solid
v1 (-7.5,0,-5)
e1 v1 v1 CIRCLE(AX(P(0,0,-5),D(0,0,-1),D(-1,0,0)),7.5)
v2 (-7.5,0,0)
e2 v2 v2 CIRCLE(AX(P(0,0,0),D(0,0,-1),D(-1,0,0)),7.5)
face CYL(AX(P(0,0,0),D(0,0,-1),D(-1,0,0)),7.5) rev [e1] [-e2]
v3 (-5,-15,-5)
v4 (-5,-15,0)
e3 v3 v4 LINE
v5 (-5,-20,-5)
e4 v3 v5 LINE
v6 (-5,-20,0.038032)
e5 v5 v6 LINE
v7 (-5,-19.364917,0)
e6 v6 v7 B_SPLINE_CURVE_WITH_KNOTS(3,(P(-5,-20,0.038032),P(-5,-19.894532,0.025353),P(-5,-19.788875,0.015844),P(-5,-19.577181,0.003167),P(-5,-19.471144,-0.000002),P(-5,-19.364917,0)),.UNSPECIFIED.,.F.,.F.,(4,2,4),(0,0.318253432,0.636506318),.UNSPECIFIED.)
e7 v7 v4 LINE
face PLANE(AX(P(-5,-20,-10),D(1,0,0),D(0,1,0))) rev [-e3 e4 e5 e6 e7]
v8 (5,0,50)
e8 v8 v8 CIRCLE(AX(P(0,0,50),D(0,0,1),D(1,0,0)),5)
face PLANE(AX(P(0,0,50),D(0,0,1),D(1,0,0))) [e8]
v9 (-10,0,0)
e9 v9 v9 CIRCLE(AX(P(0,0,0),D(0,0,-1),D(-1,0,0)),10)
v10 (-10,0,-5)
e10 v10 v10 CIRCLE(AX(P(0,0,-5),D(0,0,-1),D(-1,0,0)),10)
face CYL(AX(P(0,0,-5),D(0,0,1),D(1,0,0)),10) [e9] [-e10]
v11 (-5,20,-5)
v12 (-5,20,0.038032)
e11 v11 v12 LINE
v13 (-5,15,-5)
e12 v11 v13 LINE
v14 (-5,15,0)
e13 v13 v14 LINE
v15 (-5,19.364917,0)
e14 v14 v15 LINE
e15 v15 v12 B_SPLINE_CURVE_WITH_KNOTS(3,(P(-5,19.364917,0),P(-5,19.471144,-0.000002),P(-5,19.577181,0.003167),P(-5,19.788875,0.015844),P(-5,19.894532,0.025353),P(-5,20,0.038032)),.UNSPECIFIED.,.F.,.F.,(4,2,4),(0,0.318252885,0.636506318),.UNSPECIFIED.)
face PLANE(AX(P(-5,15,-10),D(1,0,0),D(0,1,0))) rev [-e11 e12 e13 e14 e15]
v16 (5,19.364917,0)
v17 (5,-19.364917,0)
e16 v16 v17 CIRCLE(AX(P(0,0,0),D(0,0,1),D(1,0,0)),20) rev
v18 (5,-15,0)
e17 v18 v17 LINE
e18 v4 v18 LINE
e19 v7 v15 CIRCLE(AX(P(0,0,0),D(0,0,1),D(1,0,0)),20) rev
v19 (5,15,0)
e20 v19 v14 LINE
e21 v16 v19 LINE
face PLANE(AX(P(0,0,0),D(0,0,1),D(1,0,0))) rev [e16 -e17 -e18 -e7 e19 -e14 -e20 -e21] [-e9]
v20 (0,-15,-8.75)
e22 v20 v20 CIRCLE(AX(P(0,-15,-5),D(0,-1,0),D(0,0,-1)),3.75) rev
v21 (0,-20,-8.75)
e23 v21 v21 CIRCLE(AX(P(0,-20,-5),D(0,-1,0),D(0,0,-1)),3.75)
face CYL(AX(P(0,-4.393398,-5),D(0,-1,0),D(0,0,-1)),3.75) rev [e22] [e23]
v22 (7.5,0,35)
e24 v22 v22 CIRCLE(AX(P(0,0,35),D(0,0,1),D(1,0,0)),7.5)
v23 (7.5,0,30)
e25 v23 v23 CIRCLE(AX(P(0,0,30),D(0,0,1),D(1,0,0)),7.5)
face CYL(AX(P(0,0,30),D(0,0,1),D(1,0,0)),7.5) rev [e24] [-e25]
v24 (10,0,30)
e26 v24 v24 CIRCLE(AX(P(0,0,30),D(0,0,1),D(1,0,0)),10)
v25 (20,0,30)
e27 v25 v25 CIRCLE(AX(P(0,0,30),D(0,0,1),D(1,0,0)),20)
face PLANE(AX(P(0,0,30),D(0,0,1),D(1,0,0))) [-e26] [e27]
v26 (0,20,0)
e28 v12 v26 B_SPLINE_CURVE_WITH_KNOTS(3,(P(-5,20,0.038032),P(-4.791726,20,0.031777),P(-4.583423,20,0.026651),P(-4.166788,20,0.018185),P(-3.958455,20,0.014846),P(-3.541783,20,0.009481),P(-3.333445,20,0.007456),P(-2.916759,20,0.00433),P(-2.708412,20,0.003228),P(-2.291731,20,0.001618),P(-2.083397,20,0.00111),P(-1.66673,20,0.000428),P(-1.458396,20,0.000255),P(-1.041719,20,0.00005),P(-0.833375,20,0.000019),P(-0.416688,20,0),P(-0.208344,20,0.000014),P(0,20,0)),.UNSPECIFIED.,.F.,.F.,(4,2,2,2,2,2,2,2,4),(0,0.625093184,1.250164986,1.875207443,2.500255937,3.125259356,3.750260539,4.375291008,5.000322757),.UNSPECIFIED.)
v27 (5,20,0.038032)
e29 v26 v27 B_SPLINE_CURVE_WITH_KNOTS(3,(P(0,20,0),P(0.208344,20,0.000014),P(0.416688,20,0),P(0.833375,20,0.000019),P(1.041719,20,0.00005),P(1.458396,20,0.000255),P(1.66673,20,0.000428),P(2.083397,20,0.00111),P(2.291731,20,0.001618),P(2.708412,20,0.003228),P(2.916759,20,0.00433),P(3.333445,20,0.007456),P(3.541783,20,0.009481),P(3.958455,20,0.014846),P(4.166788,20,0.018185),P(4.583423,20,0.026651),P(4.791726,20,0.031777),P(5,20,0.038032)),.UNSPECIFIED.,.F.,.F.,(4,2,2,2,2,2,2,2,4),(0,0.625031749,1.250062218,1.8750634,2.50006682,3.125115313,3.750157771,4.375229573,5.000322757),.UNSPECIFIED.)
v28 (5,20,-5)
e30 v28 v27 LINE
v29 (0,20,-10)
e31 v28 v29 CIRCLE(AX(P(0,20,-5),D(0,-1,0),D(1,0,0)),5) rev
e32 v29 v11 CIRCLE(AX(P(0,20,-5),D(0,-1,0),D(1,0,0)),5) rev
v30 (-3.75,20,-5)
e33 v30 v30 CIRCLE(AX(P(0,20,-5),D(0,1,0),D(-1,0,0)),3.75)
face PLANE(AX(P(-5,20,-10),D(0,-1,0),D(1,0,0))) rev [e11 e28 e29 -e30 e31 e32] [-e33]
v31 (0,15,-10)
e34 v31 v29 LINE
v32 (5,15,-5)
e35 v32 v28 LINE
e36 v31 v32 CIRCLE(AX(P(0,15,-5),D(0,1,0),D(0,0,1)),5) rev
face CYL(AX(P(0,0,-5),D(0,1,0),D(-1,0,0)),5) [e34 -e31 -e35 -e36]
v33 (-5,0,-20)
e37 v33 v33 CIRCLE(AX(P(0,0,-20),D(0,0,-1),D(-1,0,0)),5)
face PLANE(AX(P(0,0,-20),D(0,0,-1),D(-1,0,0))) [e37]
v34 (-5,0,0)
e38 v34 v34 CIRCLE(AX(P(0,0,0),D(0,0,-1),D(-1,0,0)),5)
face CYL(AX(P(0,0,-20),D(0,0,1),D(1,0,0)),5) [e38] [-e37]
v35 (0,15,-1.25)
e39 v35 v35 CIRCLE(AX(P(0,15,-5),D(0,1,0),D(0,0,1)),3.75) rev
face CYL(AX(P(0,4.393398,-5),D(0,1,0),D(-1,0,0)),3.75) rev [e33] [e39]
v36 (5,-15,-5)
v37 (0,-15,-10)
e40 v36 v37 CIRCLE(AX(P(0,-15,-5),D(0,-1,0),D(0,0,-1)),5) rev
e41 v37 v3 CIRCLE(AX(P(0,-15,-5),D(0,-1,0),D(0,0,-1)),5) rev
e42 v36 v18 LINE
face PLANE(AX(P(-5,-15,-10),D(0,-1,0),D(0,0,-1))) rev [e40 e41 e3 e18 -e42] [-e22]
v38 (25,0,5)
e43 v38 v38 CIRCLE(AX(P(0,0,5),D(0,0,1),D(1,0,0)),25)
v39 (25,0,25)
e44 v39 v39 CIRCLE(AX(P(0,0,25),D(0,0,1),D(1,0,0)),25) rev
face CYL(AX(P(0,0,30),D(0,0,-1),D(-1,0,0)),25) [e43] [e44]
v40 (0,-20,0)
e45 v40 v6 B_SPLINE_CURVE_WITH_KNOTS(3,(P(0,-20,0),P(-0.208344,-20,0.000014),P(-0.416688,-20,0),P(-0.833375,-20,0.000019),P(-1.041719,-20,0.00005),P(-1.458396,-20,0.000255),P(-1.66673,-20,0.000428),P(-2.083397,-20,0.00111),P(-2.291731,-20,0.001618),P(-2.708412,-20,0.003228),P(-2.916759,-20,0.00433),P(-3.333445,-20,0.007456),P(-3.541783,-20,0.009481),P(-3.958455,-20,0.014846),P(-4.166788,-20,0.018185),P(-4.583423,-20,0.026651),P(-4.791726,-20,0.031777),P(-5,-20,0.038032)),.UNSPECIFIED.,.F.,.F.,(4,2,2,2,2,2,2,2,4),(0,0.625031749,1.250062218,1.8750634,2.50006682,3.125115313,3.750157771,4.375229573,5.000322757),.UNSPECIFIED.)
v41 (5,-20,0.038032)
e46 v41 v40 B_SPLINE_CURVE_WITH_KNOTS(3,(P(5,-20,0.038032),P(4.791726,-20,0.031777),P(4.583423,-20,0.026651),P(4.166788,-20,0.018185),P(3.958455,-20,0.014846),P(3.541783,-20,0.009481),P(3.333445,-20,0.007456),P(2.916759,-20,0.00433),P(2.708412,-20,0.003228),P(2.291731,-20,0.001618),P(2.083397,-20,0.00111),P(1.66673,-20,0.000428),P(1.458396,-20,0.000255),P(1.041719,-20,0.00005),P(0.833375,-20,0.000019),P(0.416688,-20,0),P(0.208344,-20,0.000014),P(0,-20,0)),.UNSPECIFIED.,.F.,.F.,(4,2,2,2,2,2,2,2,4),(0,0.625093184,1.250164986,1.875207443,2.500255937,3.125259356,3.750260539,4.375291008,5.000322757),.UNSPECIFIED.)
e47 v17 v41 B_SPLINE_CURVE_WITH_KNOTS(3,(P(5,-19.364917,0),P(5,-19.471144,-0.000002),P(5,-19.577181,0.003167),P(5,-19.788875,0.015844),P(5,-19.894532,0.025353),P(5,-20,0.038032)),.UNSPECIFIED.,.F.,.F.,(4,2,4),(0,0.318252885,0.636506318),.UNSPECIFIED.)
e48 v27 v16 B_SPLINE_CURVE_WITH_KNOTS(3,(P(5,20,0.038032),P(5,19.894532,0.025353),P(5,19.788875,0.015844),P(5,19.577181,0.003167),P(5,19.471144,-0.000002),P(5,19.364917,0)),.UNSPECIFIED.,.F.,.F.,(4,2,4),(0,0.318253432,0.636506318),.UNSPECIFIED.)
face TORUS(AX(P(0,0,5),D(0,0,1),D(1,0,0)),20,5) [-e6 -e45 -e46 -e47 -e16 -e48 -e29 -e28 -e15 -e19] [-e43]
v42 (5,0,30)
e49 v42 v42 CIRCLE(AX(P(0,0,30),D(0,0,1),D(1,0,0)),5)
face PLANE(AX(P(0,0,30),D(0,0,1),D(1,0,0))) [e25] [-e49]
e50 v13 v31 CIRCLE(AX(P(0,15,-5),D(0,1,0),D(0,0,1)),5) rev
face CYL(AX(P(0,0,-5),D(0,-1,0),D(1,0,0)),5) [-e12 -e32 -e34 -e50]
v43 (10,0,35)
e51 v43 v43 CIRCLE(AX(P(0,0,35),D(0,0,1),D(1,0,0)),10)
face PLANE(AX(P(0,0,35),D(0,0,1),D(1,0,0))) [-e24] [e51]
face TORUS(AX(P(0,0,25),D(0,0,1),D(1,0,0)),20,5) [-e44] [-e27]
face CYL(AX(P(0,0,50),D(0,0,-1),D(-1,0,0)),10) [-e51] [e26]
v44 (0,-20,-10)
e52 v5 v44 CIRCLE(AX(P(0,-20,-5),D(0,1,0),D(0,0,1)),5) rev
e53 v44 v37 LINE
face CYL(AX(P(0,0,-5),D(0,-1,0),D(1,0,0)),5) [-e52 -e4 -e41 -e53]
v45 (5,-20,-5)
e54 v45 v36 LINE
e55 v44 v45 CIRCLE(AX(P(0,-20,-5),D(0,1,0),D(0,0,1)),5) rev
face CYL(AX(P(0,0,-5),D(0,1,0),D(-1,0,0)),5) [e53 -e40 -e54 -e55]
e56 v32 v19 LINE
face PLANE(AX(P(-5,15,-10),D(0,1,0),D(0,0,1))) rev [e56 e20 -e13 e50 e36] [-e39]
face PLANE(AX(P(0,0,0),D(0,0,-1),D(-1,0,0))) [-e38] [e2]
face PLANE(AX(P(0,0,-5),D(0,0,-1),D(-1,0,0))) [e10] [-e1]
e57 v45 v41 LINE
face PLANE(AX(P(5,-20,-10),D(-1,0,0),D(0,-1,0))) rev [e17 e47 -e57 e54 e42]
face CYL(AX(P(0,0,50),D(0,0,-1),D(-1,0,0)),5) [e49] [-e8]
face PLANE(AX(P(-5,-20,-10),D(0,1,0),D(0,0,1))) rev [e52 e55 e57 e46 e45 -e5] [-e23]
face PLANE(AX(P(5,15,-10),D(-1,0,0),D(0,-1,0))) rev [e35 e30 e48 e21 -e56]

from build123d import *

# Parameters (mm, degrees)
SKETCH1_R           = 25
BOSS_EXTRUDE1_DEPTH = 30
SKETCH2_R           = 10
BOSS_EXTRUDE2_DEPTH = 20
SKETCH3_R           = 7.5
CUT_EXTRUDE1_DEPTH  = 20
SKETCH4_R           = 5
BOSS_EXTRUDE3_DEPTH = 20
BOSS_EXTRUDE4_START = 5
SKETCH5_R           = 10
BOSS_EXTRUDE4_DEPTH = 5
SKETCH7_W           = 10
SKETCH7_H           = 5
BOSS_EXTRUDE5_DEPTH = 10
SKETCH8_R           = 3.75
CUT_EXTRUDE2_DEPTH  = 5
CUT_EXTRUDE3_START  = -5
SKETCH9_R           = 3.75
CUT_EXTRUDE3_DEPTH  = 5
FILLET1_R           = 5
FILLET2_R           = 5
CUT_EXTRUDE4_START  = -15
SKETCH10_R          = 10
SKETCH10_R_2        = 7.5
CUT_EXTRUDE4_DEPTH  = 15
CUT_EXTRUDE5_START  = -5
SKETCH11_R          = 7.5
CUT_EXTRUDE5_DEPTH  = 5
BOSS_EXTRUDE6_START = 20
SKETCH12_R          = 5
BOSS_EXTRUDE6_DEPTH = 20


# Some blends are built 0.0001 mm under size
with BuildPart() as part:
    # Sketch1 → Boss-Extrude1 (new body)
    with BuildSketch(Plane.XY):
        Circle(SKETCH1_R)
    extrude(amount=BOSS_EXTRUDE1_DEPTH)

    # Sketch2 → Boss-Extrude2 (add)
    with BuildSketch(Plane.XY.offset(30)):
        Circle(SKETCH2_R)
    extrude(amount=BOSS_EXTRUDE2_DEPTH)

    # Sketch3 → Cut-Extrude1 (cut)
    with BuildSketch(Plane.XY.offset(50)):
        Circle(SKETCH3_R)
    extrude(amount=-CUT_EXTRUDE1_DEPTH, mode=Mode.SUBTRACT)

    # Sketch4 → Boss-Extrude3 (add)
    with BuildSketch(Plane.XY.offset(30)):
        Circle(SKETCH4_R)
    extrude(amount=BOSS_EXTRUDE3_DEPTH)

    # Sketch5 → Boss-Extrude4 (add)
    with BuildSketch(Plane(origin=(0, 0, 0), x_dir=(-1, 0, 0), z_dir=(0, 0, -1)).offset(BOSS_EXTRUDE4_START)):
        with Locations(Location((0, 0, 0), (0, 0, 180))):
            Circle(SKETCH5_R)
    extrude(amount=-BOSS_EXTRUDE4_DEPTH)

    # Sketch7 → Boss-Extrude5 (add)
    with BuildSketch(Plane(origin=(0, 0, 0), x_dir=(-1, 0, 0), z_dir=(0, 0, -1))):
        with Locations((0, 17.5)):
            Rectangle(SKETCH7_W, SKETCH7_H)
        with Locations((0, -17.5)):
            Rectangle(SKETCH7_W, SKETCH7_H)
    extrude(amount=BOSS_EXTRUDE5_DEPTH)

    # Sketch8 → Cut-Extrude2 (cut)
    with BuildSketch(Plane(origin=(0, 20, 0), x_dir=(1, 0, 0), z_dir=(0, 1, 0))):
        with Locations(Location((0, 5, 0), (0, 0, 180))):
            Circle(SKETCH8_R)
    extrude(amount=-CUT_EXTRUDE2_DEPTH, mode=Mode.SUBTRACT)

    # Sketch9 → Cut-Extrude3 (cut)
    with BuildSketch(Plane(origin=(0, -20, 0), x_dir=(-1, 0, 0), z_dir=(0, -1, 0)).offset(CUT_EXTRUDE3_START)):
        with Locations((0, 5)):
            Circle(SKETCH9_R)
    extrude(amount=CUT_EXTRUDE3_DEPTH, mode=Mode.SUBTRACT)

    # Fillet1
    # the kernel refuses this fillet: 5 mm, written as the material it takes off along each edge
    with BuildSketch(Plane(origin=(0, 0, 30), x_dir=(1, 0, 0), z_dir=(0, -1, 0))) as fillet1_piece_1:
        with BuildLine():
            CenterArc((25 - FILLET1_R, -FILLET1_R), FILLET1_R, 0, 90)
            Line((25 - FILLET1_R, 0), (25, 0))
            Line((25, 0), (25, -FILLET1_R))
        make_face()
    revolve(axis=Axis((0, 0, 30), (0, 0, 1)), mode=Mode.SUBTRACT)
    with BuildSketch(Plane(origin=(0, 0, 0), x_dir=(1, 0, 0), z_dir=(0, -1, 0))) as fillet1_piece_2_section:
        with BuildLine():
            CenterArc((25 - FILLET1_R, FILLET1_R), FILLET1_R, 270, 90)
            Line((25 - FILLET1_R, 0), (25, 0))
            Line((25, 0), (25, FILLET1_R))
        make_face()
    fillet1_piece_2 = revolve(axis=Axis((0, 0, 0), (0, 0, 1)), mode=Mode.PRIVATE)
    fillet1_piece_2 = split(fillet1_piece_2, bisect_by=Plane(origin=(5, 14.511659558, 1.419610571), z_dir=(1, 0, 0)), keep=Keep.TOP, mode=Mode.PRIVATE)
    add(fillet1_piece_2, mode=Mode.SUBTRACT)
    with BuildSketch(Plane(origin=(0, 0, 0), x_dir=(1, 0, 0), z_dir=(0, -1, 0))) as fillet1_piece_3_section:
        with BuildLine():
            CenterArc((25 - FILLET1_R, FILLET1_R), FILLET1_R, 270, 90)
            Line((25 - FILLET1_R, 0), (25, 0))
            Line((25, 0), (25, FILLET1_R))
        make_face()
    fillet1_piece_3 = revolve(axis=Axis((0, 0, 0), (0, 0, 1)), mode=Mode.PRIVATE)
    fillet1_piece_3 = split(fillet1_piece_3, bisect_by=Plane(origin=(4.6e-08, 20, 1.116734198), z_dir=(0, 1, 0)), keep=Keep.TOP, mode=Mode.PRIVATE)
    add(fillet1_piece_3, mode=Mode.SUBTRACT)
    with BuildSketch(Plane(origin=(0, 0, 0), x_dir=(1, 0, 0), z_dir=(0, -1, 0))) as fillet1_piece_4_section:
        with BuildLine():
            CenterArc((25 - FILLET1_R, FILLET1_R), FILLET1_R, 270, 90)
            Line((25 - FILLET1_R, 0), (25, 0))
            Line((25, 0), (25, FILLET1_R))
        make_face()
    fillet1_piece_4 = revolve(axis=Axis((0, 0, 0), (0, 0, 1)), mode=Mode.PRIVATE)
    fillet1_piece_4 = split(fillet1_piece_4, bisect_by=Plane(origin=(-4.6e-08, -20, 1.116734198), z_dir=(0, -1, 0)), keep=Keep.TOP, mode=Mode.PRIVATE)
    add(fillet1_piece_4, mode=Mode.SUBTRACT)
    with BuildSketch(Plane(origin=(0, 0, 0), x_dir=(1, 0, 0), z_dir=(0, -1, 0))) as fillet1_piece_5_section:
        with BuildLine():
            CenterArc((25 - FILLET1_R, FILLET1_R), FILLET1_R, 270, 90)
            Line((25 - FILLET1_R, 0), (25, 0))
            Line((25, 0), (25, FILLET1_R))
        make_face()
    fillet1_piece_5 = revolve(axis=Axis((0, 0, 0), (0, 0, 1)), mode=Mode.PRIVATE)
    fillet1_piece_5 = split(fillet1_piece_5, bisect_by=Plane(origin=(-5, 0, 1.419610538), z_dir=(-1, 0, 0)), keep=Keep.TOP, mode=Mode.PRIVATE)
    add(fillet1_piece_5, mode=Mode.SUBTRACT)

    # Fillet2
    fillet2_edges = [part.edges().sort_by_distance(p)[0] for p in [
        (5, -17.5, -10),
        (-5, -17.5, -10),
        (5, 17.5, -10),
        (-5, 17.5, -10),
    ]]
    fillet(fillet2_edges, radius=FILLET2_R - 0.0001)  # a hair under: the kernel refuses the full size

    # Sketch10 → Cut-Extrude4 (cut)
    with BuildSketch(Plane.XY.offset(50).offset(CUT_EXTRUDE4_START)):
        Circle(SKETCH10_R)
        Circle(SKETCH10_R_2, mode=Mode.SUBTRACT)
    extrude(amount=CUT_EXTRUDE4_DEPTH, mode=Mode.SUBTRACT)

    # Sketch11 → Cut-Extrude5 (cut)
    with BuildSketch(Plane(origin=(0, 0, -5), x_dir=(-1, 0, 0), z_dir=(0, 0, -1)).offset(CUT_EXTRUDE5_START)):
        with Locations(Location((0, 0, 0), (0, 0, 180))):
            Circle(SKETCH11_R)
    extrude(amount=CUT_EXTRUDE5_DEPTH, mode=Mode.SUBTRACT)

    # Sketch12 → Boss-Extrude6 (add)
    with BuildSketch(Plane(origin=(0, 0, 0), x_dir=(-1, 0, 0), z_dir=(0, 0, -1)).offset(BOSS_EXTRUDE6_START)):
        with Locations(Location((0, 0, 0), (0, 0, 180))):
            Circle(SKETCH12_R)
    extrude(amount=-BOSS_EXTRUDE6_DEPTH)


solid = part.part
